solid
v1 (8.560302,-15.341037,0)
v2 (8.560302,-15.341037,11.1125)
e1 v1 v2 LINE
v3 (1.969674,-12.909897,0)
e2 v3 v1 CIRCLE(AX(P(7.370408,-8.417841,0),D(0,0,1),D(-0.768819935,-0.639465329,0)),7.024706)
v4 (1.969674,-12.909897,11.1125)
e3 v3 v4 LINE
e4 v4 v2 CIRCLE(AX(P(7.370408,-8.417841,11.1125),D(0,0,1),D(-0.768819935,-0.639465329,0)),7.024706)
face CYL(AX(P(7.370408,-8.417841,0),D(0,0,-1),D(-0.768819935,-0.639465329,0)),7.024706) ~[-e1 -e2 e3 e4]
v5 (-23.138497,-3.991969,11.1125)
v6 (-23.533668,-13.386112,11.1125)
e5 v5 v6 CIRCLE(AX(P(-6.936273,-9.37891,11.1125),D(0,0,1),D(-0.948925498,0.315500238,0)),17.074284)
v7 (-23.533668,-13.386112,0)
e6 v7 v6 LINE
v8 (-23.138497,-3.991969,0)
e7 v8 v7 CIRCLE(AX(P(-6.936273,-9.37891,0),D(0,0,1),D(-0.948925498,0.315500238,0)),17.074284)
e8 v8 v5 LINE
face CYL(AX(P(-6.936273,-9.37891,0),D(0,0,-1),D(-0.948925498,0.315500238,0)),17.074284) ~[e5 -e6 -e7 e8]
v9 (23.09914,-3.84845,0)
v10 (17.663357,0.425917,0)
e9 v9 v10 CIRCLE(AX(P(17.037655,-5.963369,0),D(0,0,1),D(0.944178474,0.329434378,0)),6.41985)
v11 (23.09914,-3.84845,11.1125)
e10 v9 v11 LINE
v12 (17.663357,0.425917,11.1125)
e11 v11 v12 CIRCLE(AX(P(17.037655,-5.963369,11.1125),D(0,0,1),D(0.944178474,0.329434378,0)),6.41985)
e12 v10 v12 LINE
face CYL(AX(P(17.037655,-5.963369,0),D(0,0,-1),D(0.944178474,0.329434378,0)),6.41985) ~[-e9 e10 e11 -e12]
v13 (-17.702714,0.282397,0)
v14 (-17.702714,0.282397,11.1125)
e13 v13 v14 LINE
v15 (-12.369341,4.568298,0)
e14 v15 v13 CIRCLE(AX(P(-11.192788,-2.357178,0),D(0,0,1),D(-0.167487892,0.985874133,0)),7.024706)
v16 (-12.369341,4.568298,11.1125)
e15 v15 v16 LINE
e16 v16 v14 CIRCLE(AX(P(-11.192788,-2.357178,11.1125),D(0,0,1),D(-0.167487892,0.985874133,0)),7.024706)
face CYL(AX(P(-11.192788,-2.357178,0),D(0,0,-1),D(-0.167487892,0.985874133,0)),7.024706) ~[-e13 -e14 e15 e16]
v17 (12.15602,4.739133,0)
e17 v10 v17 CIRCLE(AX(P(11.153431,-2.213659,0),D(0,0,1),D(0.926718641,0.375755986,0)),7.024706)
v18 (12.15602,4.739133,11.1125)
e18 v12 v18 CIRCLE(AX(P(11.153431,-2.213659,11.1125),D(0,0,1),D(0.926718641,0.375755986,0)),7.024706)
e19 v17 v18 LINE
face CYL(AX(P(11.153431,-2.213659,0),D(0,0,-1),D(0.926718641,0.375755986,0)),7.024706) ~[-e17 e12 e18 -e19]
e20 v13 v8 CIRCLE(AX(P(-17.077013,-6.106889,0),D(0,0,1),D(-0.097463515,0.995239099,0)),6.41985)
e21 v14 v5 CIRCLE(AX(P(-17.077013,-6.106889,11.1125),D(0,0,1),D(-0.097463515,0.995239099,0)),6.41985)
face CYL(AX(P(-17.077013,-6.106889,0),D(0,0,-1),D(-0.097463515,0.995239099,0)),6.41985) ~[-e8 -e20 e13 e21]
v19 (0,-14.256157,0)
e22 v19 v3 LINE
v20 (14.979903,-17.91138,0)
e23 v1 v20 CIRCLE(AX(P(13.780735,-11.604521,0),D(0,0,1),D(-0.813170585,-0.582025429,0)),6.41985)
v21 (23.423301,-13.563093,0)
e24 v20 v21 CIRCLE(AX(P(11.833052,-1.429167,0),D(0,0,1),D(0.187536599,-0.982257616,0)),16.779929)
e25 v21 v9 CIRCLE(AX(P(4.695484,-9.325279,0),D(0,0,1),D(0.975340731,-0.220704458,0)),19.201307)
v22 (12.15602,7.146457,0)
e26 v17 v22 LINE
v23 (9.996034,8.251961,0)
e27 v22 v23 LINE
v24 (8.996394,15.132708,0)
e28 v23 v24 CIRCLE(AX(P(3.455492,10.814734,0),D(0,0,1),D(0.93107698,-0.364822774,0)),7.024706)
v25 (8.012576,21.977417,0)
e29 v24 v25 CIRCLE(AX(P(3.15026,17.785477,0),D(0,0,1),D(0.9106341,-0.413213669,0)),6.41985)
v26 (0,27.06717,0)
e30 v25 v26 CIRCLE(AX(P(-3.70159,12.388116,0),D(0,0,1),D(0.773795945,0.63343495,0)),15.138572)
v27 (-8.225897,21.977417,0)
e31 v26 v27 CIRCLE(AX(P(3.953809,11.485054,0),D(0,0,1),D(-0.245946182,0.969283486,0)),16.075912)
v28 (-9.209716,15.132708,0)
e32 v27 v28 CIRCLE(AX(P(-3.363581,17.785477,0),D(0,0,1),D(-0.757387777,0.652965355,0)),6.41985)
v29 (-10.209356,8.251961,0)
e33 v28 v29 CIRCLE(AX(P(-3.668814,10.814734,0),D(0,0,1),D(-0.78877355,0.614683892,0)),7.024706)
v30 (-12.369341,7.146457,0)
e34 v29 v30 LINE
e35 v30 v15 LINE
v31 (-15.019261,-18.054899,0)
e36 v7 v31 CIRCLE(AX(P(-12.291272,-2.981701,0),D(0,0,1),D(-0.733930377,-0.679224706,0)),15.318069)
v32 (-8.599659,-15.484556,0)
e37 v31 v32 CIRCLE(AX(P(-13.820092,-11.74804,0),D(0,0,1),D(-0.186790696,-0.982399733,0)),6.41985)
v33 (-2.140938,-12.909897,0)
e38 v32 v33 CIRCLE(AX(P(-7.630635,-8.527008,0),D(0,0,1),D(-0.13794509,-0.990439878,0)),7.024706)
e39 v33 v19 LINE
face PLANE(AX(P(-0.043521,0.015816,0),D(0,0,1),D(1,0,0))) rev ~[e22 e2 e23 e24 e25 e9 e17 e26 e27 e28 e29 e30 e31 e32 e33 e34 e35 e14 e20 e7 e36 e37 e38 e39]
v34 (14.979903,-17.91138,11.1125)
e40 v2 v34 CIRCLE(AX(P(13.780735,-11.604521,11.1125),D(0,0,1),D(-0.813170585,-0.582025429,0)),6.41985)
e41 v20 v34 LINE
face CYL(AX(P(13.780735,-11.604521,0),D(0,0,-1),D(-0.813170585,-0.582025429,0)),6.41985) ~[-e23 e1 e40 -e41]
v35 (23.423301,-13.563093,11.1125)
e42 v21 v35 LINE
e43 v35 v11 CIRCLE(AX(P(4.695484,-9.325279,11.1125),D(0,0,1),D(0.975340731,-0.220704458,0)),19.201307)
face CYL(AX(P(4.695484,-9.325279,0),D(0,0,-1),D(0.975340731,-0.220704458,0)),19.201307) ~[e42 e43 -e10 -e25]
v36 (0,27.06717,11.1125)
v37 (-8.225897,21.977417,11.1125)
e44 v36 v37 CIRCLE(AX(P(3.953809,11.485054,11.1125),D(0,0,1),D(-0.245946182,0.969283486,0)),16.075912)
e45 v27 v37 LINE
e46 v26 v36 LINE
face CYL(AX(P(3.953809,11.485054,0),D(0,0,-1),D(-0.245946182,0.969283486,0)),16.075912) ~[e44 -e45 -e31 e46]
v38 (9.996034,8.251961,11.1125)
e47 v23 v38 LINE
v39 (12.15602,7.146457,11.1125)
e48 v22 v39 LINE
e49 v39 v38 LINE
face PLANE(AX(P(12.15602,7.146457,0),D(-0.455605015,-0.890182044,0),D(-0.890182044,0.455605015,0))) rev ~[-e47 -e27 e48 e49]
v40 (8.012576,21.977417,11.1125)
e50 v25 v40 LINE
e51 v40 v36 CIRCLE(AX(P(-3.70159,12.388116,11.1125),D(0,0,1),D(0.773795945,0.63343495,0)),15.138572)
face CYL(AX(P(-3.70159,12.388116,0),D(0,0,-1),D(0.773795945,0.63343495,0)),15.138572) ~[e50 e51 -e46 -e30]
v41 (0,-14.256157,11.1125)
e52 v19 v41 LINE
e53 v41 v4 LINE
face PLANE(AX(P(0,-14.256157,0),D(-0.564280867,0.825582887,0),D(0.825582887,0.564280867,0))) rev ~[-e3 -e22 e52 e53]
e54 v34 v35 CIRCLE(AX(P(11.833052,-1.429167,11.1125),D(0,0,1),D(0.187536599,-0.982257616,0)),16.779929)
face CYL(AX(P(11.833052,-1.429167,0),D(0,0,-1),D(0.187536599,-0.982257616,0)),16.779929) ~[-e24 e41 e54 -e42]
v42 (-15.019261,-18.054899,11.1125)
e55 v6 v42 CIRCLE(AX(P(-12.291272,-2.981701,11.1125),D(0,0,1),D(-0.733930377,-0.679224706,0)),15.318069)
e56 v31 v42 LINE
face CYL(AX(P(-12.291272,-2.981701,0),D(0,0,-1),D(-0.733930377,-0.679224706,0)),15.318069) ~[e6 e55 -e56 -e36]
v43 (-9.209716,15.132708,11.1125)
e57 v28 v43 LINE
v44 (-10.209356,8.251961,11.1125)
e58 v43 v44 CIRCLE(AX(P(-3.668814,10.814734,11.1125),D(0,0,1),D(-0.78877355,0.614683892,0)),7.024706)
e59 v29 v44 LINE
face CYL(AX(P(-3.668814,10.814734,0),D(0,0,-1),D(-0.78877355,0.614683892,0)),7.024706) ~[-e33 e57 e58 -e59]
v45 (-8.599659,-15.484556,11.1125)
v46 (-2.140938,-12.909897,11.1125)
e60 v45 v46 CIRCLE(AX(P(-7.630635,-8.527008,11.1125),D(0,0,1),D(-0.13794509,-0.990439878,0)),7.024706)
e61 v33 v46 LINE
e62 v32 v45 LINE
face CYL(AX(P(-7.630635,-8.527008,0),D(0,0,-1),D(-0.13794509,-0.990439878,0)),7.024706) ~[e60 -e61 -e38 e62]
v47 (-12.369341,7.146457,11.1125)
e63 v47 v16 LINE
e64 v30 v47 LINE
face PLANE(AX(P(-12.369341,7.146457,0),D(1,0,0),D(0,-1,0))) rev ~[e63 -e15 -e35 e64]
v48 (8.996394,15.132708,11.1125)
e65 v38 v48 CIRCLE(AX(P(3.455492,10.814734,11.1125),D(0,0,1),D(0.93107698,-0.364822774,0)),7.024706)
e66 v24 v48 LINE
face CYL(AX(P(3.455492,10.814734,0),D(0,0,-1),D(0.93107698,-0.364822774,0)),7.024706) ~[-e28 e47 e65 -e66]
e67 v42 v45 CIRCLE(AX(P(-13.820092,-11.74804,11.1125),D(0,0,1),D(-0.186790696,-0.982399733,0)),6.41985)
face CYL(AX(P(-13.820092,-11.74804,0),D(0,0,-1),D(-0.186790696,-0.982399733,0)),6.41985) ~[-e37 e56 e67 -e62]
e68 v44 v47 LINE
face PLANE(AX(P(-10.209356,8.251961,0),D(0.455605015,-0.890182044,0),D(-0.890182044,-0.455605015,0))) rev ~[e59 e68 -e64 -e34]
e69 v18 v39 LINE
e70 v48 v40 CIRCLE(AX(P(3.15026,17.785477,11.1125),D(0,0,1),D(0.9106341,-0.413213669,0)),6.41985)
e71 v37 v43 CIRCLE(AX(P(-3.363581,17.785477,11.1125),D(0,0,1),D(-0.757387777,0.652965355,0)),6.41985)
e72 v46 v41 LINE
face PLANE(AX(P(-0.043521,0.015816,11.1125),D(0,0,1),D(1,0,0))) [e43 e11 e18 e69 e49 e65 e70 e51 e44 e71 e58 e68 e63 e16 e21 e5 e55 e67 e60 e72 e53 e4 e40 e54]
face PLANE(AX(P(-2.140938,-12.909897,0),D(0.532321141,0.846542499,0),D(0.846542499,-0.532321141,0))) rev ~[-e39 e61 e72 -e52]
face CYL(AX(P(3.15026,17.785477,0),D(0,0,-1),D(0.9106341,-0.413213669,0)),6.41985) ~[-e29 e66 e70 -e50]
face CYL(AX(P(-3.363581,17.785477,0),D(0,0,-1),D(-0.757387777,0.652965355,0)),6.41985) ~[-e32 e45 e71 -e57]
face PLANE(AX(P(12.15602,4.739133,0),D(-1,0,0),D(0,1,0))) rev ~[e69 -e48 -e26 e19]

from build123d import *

# Parameters (mm, degrees)
F1_DEPTH = 11.1125


# Not quite as in the source:
# - a length typed as a fraction of an inch, garbled in the dataset ("3 / 203.2 mm" for 3/8 in), is restored


with BuildPart() as f1:
    # F0 (on Top) → F1 (new body)
    with BuildSketch(Plane.XY):
        with BuildLine():
            ThreePointArc((0, 27.0671695471), (-4.5048536548, 25.1556778504), (-8.2258973271, 21.977417171))
            ThreePointArc((-8.2258973271, 21.977417171), (-9.7181261566, 18.698842434), (-9.2097157612, 15.1327075437))
            ThreePointArc((-9.2097157612, 15.1327075437), (-10.6205392688, 11.8246856933), (-10.2093555033, 8.2519613206))
            Line((-10.2093555033, 8.2519613206), (-12.369341217, 7.1464567445))
            Line((-12.369341217, 7.1464567445), (-12.369341217, 4.6386048198))
            Line((-12.369341217, 4.6386048198), (-12.369341217, 4.5682978211))
            ThreePointArc((-12.369341217, 4.5682978211), (-15.5930977879, 3.1185654947), (-17.7027139134, 0.2823972963))
            ThreePointArc((-17.7027139134, 0.2823972963), (-21.0452825194, -1.0603738309), (-23.1384971151, -3.9919692741))
            ThreePointArc((-23.1384971151, -3.9919692741), (-23.9954710425, -8.6613028545), (-23.5336683691, -13.3861117065))
            ThreePointArc((-23.5336683691, -13.3861117065), (-19.6562098094, -16.4130421994), (-15.0192606046, -18.054899429))
            ThreePointArc((-15.0192606046, -18.054899429), (-11.4338171794, -17.7079201351), (-8.5996589687, -15.484556372))
            ThreePointArc((-8.5996589687, -15.484556372), (-5.0294162563, -15.0523544446), (-2.1409380715, -12.9098966718))
            Line((-2.1409380715, -12.9098966718), (0, -14.2561570176))
            Line((0, -14.2561570176), (1.9696742658, -12.9098966718))
            ThreePointArc((1.9696742658, -12.9098966718), (4.9392756736, -15.0084468105), (8.560301624, -15.3410370587))
            ThreePointArc((8.560301624, -15.3410370587), (11.3944598347, -17.5644008218), (14.9799032599, -17.9113801157))
            ThreePointArc((14.9799032599, -17.9113801157), (19.5156578324, -16.3470620723), (23.423301056, -13.563092798))
            ThreePointArc((23.423301056, -13.563092798), (23.8861103651, -8.6849198531), (23.0991397704, -3.8484499608))
            ThreePointArc((23.0991397704, -3.8484499608), (21.0059251747, -0.9168545176), (17.6633565687, 0.4259166096))
            ThreePointArc((17.6633565687, 0.4259166096), (15.4847616458, 3.3168082822), (12.1560195839, 4.739132713))
            Line((12.1560195839, 4.739132713), (12.1560195839, 7.1464567445))
            Line((12.1560195839, 7.1464567445), (9.9960338703, 8.2519613206))
            ThreePointArc((9.9960338703, 8.2519613206), (10.4072176357, 11.8246856933), (8.9963941282, 15.1327075437))
            ThreePointArc((8.9963941282, 15.1327075437), (9.5048045235, 18.698842434), (8.012575694, 21.977417171))
            ThreePointArc((8.012575694, 21.977417171), (4.4155385291, 25.1665589), (0, 27.0671695471))
        make_face()
    extrude(amount=F1_DEPTH)


solid = f1.part
